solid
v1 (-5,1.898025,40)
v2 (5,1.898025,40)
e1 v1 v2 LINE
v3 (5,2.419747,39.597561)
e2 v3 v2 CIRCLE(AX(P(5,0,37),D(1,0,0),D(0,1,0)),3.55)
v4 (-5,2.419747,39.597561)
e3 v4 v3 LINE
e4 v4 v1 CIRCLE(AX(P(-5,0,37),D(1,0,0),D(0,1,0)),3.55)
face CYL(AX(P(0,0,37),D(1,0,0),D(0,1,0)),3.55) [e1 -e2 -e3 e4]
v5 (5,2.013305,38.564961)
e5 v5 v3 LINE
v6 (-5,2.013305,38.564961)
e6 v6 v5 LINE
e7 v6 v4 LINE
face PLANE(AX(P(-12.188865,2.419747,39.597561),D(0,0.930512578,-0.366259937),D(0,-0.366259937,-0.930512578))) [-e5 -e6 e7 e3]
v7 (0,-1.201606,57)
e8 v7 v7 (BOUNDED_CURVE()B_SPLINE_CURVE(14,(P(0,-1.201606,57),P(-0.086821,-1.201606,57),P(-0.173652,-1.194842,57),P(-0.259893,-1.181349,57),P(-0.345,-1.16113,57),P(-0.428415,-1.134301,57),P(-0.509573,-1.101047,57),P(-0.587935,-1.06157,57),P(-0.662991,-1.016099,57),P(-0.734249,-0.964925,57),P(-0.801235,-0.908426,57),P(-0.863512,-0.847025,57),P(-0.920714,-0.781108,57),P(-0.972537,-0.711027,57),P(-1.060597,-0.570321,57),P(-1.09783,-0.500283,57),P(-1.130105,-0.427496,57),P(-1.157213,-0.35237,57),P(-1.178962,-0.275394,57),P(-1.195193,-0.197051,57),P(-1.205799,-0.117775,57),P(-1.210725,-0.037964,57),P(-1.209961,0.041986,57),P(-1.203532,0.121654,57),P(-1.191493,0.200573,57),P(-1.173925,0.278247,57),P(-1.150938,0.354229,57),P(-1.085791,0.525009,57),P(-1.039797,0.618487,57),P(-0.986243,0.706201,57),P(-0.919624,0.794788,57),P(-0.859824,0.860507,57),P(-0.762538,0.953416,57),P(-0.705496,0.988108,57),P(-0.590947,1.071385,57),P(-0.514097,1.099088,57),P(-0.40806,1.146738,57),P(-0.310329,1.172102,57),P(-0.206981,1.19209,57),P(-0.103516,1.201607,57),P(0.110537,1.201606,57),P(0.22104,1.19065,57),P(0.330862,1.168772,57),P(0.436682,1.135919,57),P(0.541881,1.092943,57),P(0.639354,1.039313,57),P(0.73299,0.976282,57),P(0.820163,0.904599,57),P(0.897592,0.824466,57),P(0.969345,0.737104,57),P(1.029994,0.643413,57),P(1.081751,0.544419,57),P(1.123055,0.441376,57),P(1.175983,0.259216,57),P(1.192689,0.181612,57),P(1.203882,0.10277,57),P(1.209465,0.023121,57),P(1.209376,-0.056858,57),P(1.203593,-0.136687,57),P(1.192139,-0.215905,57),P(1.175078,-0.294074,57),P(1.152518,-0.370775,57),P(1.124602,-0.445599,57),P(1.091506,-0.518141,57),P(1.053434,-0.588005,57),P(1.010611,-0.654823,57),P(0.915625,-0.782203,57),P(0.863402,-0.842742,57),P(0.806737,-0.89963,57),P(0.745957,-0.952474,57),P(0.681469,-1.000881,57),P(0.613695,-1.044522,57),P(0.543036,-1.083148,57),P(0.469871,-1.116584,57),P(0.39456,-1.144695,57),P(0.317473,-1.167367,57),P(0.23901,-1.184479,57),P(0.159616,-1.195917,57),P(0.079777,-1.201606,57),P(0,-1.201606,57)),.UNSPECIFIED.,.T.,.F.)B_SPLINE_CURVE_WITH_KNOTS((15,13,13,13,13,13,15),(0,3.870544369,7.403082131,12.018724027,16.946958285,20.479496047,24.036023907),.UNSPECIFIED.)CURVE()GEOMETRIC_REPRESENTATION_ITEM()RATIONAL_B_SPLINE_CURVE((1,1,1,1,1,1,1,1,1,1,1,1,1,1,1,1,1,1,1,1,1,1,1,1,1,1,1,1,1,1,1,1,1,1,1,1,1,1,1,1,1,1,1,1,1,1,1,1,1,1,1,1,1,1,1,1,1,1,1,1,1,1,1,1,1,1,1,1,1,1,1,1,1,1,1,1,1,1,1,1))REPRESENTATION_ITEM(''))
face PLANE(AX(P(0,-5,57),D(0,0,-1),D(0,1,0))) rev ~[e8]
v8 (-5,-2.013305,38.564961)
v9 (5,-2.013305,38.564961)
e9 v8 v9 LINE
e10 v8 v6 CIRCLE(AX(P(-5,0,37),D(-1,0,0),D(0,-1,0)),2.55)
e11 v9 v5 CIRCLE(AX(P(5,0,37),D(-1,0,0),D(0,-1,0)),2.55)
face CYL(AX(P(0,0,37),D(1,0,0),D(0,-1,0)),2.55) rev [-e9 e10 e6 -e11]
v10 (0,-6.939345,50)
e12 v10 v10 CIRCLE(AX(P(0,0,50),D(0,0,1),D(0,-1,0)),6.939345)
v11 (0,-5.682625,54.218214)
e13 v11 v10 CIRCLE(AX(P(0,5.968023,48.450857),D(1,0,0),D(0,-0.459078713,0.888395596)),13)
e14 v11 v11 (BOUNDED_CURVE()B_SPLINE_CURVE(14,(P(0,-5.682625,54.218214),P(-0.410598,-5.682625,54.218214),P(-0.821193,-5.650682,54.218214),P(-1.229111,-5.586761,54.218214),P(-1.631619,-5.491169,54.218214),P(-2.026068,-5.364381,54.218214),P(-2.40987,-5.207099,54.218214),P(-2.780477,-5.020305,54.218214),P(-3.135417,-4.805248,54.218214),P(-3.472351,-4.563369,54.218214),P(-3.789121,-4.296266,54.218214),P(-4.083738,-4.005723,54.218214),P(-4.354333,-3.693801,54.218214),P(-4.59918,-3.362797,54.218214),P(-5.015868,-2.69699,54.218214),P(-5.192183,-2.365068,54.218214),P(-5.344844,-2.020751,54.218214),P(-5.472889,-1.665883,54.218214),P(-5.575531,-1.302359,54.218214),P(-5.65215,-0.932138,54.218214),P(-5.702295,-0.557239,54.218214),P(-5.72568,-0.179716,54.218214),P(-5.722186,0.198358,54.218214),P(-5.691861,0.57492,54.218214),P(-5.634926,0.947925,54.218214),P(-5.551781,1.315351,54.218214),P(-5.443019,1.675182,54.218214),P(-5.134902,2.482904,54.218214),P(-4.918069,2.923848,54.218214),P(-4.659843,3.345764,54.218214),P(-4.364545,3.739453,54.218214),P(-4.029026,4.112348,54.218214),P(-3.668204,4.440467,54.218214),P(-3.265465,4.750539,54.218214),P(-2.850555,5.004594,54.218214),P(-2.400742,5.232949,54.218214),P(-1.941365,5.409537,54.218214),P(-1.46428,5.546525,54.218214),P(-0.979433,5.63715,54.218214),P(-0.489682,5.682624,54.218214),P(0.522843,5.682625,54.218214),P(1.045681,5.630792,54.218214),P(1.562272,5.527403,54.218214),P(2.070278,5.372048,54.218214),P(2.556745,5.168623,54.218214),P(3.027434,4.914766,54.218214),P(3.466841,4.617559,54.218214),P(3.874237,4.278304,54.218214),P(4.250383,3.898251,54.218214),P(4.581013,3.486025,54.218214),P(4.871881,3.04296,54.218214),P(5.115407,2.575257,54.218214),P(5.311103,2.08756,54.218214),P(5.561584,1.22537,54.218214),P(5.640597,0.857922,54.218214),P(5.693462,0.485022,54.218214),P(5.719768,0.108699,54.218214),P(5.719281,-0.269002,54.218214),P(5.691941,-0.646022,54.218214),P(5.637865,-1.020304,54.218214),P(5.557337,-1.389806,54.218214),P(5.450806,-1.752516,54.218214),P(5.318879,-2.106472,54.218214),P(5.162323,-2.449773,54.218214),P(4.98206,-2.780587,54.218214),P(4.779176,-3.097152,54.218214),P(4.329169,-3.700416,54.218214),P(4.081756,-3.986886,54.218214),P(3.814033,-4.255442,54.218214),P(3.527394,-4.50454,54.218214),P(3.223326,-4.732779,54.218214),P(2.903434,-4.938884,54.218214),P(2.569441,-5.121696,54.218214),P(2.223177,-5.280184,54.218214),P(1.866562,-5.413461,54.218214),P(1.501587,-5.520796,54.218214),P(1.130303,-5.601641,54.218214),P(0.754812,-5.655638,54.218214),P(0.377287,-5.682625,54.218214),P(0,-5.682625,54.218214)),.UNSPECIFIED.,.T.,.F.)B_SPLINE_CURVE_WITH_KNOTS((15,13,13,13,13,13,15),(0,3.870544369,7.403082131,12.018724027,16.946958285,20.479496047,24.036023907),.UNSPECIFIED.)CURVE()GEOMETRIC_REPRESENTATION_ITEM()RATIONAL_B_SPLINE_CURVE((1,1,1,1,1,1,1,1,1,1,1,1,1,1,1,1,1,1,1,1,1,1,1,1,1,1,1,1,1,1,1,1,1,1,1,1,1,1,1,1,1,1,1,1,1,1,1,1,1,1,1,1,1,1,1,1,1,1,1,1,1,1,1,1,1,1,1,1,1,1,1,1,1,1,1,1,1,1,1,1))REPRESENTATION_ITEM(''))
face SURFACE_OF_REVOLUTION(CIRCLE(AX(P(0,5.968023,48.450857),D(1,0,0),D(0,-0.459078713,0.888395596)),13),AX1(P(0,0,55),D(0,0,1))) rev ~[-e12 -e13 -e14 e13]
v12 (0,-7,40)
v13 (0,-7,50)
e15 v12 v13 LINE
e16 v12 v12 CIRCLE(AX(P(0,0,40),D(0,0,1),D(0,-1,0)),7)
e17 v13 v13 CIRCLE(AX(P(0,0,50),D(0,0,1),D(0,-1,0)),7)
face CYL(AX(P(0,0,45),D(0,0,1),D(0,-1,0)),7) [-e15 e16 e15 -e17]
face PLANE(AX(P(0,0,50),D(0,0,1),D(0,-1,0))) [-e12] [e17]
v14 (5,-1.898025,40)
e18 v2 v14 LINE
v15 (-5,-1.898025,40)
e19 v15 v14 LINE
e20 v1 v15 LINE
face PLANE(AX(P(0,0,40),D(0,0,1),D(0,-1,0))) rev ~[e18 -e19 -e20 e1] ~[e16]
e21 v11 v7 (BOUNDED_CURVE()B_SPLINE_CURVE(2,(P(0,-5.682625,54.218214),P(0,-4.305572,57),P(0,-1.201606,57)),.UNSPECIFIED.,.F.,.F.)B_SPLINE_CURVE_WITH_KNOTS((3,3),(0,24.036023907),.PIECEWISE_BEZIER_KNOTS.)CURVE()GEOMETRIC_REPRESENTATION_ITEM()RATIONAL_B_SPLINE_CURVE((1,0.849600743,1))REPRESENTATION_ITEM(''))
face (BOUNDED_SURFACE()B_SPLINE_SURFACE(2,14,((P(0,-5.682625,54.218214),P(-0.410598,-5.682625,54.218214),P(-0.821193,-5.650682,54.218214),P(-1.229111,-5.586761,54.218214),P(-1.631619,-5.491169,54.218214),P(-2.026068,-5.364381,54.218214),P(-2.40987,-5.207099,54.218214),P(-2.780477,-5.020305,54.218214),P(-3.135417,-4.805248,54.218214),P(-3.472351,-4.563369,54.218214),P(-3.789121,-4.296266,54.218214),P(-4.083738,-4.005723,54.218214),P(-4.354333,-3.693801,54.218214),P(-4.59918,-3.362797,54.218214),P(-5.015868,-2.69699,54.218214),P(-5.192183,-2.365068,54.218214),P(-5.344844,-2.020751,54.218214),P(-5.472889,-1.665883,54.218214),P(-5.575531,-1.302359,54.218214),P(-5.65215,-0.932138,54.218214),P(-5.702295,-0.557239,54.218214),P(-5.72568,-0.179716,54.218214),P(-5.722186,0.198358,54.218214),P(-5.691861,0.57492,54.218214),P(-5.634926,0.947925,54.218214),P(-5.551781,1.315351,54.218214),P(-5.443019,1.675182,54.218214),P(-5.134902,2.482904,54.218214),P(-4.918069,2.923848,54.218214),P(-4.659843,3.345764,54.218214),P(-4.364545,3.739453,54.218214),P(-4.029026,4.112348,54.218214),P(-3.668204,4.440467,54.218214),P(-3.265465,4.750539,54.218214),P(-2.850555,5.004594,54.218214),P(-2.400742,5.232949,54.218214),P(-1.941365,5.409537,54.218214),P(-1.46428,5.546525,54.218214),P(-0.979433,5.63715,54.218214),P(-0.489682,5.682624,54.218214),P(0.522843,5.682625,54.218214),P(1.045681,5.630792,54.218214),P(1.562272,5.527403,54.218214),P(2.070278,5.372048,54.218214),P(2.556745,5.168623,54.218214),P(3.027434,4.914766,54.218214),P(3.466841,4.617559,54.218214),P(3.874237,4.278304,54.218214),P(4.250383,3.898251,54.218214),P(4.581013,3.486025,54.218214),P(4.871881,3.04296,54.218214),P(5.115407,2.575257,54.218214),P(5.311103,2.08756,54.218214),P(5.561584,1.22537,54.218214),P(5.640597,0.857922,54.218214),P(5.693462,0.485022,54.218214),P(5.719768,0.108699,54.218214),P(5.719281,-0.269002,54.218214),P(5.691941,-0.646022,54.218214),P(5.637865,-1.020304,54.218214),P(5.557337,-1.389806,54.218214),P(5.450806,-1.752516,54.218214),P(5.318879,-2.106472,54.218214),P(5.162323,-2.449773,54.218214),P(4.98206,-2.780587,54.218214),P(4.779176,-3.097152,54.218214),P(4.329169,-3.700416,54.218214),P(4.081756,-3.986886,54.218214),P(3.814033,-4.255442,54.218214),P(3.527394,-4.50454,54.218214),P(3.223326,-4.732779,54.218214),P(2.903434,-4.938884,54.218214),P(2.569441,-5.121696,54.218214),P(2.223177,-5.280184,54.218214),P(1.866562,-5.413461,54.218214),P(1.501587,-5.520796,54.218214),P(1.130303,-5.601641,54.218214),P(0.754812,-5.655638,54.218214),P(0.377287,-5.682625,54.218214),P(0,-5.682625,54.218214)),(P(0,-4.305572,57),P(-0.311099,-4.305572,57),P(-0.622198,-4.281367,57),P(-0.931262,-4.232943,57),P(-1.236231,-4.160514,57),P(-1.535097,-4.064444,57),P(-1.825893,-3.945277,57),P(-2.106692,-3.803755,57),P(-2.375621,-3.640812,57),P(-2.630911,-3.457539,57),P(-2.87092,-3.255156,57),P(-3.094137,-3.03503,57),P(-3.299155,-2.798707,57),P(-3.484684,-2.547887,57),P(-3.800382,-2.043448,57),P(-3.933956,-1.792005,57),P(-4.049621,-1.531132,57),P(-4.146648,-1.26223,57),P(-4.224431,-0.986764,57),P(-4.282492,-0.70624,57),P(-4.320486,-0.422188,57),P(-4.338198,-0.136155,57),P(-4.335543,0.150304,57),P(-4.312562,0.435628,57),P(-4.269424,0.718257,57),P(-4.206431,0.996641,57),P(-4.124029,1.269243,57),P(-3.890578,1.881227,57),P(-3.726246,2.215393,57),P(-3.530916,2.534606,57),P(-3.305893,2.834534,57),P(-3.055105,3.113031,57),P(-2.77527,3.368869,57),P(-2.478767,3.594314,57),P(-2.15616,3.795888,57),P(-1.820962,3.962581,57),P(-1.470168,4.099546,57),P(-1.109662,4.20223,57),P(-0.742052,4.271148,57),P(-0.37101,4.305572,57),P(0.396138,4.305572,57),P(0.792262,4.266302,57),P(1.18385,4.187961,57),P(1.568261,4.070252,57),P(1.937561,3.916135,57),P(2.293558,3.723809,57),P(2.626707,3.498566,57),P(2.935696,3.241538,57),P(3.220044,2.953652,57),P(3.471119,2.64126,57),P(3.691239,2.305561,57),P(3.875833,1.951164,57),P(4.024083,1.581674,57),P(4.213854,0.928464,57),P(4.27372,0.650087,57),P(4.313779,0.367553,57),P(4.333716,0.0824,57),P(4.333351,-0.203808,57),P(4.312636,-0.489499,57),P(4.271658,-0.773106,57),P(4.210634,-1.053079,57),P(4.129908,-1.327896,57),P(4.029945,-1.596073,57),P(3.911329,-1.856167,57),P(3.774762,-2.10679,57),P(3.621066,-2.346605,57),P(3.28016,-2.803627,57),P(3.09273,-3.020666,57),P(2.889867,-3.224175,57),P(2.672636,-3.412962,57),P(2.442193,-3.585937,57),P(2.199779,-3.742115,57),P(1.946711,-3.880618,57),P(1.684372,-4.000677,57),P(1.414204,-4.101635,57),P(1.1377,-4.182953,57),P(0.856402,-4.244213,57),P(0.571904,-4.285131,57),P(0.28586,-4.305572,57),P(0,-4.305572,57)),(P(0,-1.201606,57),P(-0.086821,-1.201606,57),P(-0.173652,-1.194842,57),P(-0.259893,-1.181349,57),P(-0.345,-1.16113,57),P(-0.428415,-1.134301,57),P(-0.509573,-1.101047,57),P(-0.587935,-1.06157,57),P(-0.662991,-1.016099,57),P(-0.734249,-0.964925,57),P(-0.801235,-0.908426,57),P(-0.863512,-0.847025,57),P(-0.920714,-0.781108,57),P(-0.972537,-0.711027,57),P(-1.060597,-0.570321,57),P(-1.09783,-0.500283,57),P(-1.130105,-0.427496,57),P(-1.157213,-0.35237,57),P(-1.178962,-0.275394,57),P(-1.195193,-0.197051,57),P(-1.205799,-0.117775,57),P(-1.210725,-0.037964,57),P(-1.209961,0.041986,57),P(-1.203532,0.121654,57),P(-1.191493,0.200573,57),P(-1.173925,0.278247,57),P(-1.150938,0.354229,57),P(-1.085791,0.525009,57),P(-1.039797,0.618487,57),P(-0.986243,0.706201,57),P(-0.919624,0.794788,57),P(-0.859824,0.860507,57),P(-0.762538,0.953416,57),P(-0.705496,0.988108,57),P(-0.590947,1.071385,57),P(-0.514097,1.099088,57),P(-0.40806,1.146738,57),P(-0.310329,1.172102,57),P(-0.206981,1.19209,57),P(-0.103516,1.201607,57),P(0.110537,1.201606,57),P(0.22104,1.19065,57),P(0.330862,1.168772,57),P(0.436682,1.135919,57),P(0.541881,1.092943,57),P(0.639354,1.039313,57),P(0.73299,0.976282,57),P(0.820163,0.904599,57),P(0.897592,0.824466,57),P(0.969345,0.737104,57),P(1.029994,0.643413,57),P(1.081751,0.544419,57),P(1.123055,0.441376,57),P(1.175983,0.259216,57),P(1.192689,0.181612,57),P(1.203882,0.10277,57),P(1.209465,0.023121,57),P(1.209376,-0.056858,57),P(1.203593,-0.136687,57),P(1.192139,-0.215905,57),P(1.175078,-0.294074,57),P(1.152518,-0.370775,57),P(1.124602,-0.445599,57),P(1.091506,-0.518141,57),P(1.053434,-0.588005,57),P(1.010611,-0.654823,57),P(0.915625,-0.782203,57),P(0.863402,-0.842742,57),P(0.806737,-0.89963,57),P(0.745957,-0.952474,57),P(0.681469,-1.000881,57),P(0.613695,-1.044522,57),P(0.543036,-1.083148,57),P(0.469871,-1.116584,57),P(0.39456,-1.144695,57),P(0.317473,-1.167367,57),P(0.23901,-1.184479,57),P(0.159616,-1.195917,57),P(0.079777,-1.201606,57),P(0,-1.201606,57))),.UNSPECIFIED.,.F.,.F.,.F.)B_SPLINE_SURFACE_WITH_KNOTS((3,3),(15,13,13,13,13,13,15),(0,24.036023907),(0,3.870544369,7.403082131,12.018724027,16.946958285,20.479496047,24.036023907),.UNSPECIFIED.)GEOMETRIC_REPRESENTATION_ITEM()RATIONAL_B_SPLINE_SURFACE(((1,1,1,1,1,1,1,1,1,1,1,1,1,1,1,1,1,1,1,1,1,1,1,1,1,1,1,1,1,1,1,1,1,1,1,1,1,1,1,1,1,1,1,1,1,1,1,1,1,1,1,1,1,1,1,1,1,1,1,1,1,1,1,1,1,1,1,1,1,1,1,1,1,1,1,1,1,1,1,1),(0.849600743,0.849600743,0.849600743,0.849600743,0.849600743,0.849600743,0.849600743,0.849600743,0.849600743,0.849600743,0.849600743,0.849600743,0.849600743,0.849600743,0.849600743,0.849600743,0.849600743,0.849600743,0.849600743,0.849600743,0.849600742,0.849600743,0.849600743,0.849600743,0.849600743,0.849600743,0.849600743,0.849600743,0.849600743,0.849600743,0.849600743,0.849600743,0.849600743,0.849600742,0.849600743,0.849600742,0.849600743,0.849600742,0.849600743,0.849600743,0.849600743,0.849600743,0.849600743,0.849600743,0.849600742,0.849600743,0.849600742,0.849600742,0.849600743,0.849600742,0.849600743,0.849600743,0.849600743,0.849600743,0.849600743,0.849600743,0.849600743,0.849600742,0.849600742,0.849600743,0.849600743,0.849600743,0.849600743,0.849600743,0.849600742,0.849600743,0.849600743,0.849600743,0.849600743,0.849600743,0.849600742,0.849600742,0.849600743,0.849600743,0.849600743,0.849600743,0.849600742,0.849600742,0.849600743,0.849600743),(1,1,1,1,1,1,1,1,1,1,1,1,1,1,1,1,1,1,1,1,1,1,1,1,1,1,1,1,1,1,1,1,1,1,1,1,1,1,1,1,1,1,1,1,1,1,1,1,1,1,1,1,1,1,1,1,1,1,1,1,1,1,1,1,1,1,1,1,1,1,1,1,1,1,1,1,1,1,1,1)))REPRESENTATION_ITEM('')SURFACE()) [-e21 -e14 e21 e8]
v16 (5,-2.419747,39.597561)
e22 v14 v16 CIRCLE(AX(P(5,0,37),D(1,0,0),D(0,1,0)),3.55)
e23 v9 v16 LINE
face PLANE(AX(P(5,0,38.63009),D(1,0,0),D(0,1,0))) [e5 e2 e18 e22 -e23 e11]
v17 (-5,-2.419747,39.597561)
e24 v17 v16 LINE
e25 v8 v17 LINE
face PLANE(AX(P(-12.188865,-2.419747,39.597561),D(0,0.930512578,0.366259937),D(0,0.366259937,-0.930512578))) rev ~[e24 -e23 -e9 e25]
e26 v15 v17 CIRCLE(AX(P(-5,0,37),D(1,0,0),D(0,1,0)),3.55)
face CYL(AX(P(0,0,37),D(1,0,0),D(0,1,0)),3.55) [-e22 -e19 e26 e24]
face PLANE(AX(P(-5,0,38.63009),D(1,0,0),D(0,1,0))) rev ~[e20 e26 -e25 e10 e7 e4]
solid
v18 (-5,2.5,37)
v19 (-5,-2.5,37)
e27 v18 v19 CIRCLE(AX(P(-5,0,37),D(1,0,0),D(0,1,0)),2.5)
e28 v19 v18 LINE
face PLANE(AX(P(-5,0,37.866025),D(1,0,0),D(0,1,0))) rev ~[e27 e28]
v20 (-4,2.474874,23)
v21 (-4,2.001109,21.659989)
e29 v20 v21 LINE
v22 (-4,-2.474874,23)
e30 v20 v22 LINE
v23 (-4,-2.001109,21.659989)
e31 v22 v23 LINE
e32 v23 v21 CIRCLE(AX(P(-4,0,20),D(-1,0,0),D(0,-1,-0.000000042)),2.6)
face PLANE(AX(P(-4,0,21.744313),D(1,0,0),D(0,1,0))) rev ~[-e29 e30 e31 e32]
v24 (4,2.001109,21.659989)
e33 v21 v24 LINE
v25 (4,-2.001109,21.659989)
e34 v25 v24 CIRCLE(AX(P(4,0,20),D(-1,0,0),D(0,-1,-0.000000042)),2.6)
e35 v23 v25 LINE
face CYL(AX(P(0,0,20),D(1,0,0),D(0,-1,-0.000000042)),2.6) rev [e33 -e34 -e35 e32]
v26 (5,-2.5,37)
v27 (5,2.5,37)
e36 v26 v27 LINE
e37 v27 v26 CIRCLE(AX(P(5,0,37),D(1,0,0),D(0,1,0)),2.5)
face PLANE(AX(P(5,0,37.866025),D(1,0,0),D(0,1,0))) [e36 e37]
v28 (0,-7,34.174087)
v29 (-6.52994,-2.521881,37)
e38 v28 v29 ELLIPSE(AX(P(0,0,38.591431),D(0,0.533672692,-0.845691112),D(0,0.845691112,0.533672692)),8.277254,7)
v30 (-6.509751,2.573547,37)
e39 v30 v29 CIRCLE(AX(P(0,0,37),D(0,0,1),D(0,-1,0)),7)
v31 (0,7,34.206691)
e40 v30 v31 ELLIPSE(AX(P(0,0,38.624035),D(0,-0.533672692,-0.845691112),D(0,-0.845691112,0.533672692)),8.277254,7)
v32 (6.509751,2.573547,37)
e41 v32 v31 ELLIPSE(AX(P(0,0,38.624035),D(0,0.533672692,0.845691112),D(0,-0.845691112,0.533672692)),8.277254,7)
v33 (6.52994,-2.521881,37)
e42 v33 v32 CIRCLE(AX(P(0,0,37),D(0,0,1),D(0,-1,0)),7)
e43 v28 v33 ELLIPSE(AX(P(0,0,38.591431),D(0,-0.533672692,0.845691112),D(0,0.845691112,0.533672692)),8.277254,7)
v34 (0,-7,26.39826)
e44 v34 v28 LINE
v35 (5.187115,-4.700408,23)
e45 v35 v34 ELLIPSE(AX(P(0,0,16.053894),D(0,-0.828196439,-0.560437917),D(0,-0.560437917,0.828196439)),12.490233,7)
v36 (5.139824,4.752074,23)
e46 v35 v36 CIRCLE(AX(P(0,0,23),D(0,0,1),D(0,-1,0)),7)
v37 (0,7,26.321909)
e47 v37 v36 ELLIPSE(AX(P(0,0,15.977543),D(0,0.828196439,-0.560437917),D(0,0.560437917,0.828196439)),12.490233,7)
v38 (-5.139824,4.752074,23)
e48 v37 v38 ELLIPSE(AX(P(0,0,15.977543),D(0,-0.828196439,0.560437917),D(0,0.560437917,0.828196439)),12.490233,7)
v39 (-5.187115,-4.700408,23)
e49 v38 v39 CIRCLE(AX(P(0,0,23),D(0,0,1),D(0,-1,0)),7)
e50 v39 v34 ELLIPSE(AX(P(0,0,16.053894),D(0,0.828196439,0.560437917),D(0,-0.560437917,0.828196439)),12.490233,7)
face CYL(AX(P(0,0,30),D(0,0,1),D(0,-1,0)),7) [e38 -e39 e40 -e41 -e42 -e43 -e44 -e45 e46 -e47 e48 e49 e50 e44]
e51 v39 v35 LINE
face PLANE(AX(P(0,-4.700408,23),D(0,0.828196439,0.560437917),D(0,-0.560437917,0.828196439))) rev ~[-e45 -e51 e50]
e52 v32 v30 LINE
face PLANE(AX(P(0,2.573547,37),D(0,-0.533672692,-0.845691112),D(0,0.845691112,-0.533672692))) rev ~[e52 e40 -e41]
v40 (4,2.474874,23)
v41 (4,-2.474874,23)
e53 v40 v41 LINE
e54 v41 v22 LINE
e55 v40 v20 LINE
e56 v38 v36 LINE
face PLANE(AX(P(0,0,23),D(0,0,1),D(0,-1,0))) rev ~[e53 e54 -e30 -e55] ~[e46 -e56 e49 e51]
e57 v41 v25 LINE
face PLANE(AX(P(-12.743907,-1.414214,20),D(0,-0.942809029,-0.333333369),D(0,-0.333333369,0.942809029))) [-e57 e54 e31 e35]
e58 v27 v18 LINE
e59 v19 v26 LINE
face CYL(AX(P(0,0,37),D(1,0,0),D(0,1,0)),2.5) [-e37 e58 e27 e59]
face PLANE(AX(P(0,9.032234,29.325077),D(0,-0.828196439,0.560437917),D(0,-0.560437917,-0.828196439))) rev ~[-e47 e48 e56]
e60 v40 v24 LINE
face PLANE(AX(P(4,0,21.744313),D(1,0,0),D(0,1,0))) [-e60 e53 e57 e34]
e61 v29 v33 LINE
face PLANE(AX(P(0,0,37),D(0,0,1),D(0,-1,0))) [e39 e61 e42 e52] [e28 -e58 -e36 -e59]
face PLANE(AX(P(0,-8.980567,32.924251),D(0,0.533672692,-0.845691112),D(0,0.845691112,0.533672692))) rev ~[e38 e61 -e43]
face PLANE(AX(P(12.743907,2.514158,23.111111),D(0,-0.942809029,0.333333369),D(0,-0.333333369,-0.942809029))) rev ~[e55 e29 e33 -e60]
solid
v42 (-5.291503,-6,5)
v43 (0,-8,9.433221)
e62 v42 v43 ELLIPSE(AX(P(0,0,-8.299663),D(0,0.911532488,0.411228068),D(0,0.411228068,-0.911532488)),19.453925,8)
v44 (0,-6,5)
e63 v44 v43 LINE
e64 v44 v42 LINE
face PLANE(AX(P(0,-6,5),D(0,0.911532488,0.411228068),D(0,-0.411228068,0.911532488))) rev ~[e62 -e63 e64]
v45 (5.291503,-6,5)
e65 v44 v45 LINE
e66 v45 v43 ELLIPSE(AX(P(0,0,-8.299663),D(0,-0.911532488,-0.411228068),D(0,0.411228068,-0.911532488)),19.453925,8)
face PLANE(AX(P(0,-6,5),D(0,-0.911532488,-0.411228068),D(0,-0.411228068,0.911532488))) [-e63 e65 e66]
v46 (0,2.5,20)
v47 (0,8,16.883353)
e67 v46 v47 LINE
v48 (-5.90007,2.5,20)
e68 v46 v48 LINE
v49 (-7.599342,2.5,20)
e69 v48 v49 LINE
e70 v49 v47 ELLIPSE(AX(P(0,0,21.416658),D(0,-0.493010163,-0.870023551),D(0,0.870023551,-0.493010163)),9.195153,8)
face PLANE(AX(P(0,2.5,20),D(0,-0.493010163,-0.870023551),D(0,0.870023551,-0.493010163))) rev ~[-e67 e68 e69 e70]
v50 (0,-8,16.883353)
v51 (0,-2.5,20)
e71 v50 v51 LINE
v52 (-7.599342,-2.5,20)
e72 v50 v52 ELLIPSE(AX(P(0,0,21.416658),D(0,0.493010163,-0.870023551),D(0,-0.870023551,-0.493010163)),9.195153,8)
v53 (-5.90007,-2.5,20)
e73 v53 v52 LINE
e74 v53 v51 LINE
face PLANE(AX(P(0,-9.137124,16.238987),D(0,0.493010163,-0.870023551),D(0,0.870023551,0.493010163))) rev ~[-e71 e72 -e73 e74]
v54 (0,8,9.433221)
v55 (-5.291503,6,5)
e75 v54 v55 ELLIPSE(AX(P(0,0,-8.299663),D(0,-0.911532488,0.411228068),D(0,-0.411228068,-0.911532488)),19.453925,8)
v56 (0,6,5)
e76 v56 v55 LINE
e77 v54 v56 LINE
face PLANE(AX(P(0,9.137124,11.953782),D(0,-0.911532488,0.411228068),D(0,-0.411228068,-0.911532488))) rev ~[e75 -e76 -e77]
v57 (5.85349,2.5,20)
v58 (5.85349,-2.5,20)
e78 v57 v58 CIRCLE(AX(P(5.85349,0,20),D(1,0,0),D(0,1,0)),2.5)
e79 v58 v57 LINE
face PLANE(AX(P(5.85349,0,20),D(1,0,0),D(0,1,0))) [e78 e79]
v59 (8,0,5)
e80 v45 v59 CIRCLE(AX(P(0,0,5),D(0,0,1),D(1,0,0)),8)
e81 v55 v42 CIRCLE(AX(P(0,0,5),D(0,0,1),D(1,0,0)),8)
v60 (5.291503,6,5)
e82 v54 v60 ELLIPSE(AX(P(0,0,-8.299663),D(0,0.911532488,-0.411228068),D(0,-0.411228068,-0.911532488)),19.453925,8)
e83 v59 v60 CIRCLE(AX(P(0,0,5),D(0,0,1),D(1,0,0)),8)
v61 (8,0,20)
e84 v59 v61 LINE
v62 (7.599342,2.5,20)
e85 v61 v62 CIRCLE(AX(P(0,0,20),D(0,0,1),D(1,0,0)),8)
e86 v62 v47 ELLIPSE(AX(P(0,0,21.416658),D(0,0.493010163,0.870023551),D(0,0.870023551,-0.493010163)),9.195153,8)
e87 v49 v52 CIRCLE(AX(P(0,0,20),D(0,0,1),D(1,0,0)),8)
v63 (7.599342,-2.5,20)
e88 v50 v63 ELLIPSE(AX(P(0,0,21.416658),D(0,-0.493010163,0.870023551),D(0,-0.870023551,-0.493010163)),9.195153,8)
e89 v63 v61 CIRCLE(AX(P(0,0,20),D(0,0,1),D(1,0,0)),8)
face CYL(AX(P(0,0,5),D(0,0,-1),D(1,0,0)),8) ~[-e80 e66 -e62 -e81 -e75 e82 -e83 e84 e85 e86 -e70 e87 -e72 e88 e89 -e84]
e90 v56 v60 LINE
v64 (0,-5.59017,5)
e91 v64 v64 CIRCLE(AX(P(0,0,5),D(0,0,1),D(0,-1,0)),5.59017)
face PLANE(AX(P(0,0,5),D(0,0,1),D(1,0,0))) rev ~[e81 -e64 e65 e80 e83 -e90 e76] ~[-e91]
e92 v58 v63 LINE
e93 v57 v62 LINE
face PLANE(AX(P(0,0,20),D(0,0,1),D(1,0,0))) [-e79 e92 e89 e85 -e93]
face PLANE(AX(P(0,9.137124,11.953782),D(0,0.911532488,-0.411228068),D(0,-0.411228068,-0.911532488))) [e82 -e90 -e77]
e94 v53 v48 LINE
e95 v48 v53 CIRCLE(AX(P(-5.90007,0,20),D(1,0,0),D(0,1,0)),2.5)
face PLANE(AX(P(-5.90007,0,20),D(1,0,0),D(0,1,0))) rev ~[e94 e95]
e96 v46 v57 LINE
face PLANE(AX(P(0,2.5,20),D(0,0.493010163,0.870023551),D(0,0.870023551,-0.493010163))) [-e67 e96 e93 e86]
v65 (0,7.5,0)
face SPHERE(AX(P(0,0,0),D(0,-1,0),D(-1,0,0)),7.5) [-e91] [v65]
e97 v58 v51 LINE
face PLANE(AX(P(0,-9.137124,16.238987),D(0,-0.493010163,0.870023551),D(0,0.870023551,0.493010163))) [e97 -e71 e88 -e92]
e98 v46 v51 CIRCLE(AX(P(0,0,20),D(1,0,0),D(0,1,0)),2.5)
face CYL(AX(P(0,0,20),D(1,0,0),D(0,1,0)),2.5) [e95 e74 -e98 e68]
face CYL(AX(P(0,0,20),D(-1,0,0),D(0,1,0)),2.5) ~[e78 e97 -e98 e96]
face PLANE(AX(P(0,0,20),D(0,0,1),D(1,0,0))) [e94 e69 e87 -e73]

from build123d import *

# Parameters (mm, degrees)
F3_R           = 8
F4_DEPTH       = 15
F5_R           = 2.5
F6_DEPTH       = 5.85349
F6_DEPTH_BACK  = 5.90007
F8_DEPTH       = 25
F8_DEPTH_BACK  = 25
F10_DEPTH      = 4
F10_DEPTH_BACK = 4
F11_W          = 7
F11_H          = 14
F13_T4_DEPTH   = 25.4878140401
F13_T9_DEPTH   = 25.4878140401
F15_DEPTH      = 5
F15_DEPTH_BACK = 5
F17_DEPTH      = 25
F17_DEPTH_BACK = 25
F19_DEPTH      = 5
F19_DEPTH_BACK = 5
F20_W          = 7
F20_H          = 10
F24_W          = 10
F24_H          = 3
F25_DEPTH      = 25
F25_DEPTH_BACK = 25
F26_R          = 5
F27_T1_DEPTH   = 24.3777308897


# Not quite as in the source:
# - a fillet or chamfer that OpenCascade refuses, or shapes differently, is made with other operations: its cross-section is extruded or revolved along the edge and cut away or added


with BuildPart() as f1:
    # F0 (on Top) → F1 (revolve)
    with BuildSketch(Plane.XY):
        with BuildLine():
            Line((0, -7.5), (0, 7.5))
            ThreePointArc((0, 7.5), (-7.5, 0), (0, -7.5))
        make_face()
    revolve(axis=Axis((0, 0, 0), (0, -1, 0)))

    # F3 (on offset) → F4 (join)
    with BuildSketch(Plane.XY.offset(5)):
        Circle(F3_R)
    extrude(amount=F4_DEPTH)

    # F5 (on Right) → F6 (join, two sides)
    with BuildSketch(Plane.YZ) as f6_sk:
        with Locations((0, 20)):
            Circle(F5_R)
    extrude(amount=F6_DEPTH)
    extrude(f6_sk.sketch, amount=-F6_DEPTH_BACK)

    # F7 (on Right) → F8 (cut, two sides)
    with BuildSketch(Plane.YZ) as f8_sk:
        Polygon((9.1371238232, 20), (2.5, 20), (9.1371238232, 16.2389874458), align=None)
        Polygon((-9.1371238232, 16.2389874458), (-2.5, 20), (-9.1371238232, 20), align=None)
        Polygon((-9.1371238232, 11.9537818628), (-9.1371238232, 5), (-6, 5), align=None)
        Polygon((9.1371238232, 11.9537818628), (6, 5), (9.1371238232, 5), align=None)
    extrude(amount=-F8_DEPTH, mode=Mode.SUBTRACT)
    extrude(f8_sk.sketch, amount=F8_DEPTH_BACK, mode=Mode.SUBTRACT)


with BuildPart() as f10:
    # F9 (on Right) → F10 (new body, two sides)
    with BuildSketch(Plane.YZ) as f10_sk:
        with BuildLine():
            ThreePointArc((-2.6, 20), (0, 22.6000001084), (2.6, 20))
            Line((2.6, 20), (4, 20))
            ThreePointArc((4, 20), (0, 24.0000001084), (-4, 20))
            Line((-4, 20), (-2.6, 20))
        make_face()
    extrude(amount=F10_DEPTH)
    extrude(f10_sk.sketch, amount=-F10_DEPTH_BACK)

    # F11 (on Right) → F12 (revolve)
    with BuildSketch(Plane.YZ):
        with Locations((-3.5, 30)):
            Rectangle(F11_W, F11_H)
    revolve(axis=Axis((0, 0, 30), (0, 0, 1)))

    # F13: chamfer of 1.75 on 2 edges, made by hand


with BuildPart() as f13_tool2:
    # F13_s3 → F13_t4 (new body)
    with BuildSketch(Plane.YZ.offset(-12.74390702)):
        with BuildLine():
            Line((-1.4142136966, 20), (-2.5141576828, 23.1111110268))
            ThreePointArc((-2.5141576828, 23.1111110268), (-3.5976530662, 21.7483972072), (-4, 20))
            Line((-4, 20), (-1.4142136966, 20))
        make_face()
    extrude(amount=F13_T4_DEPTH)

    split(bisect_by=Plane.XY.offset(23), keep=Keep.BOTTOM)


with BuildPart() as f10_1:
    add(f10.part)

    # F13_t1: cut F13_tool2
    add(f13_tool2.part, mode=Mode.SUBTRACT)


with BuildPart() as f13_tool7:
    # F13_s8 → F13_t9 (new body)
    with BuildSketch(Plane.YZ.offset(12.74390702)):
        with BuildLine():
            Line((2.5141576828, 23.1111110268), (1.4142136966, 20))
            Line((1.4142136966, 20), (4, 20))
            ThreePointArc((4, 20), (3.5976530662, 21.7483972072), (2.5141576828, 23.1111110268))
        make_face()
    extrude(amount=-F13_T9_DEPTH)

    split(bisect_by=Plane.XY.offset(23), keep=Keep.BOTTOM)


with BuildPart() as f10_2:
    add(f10_1.part)

    # F13_t6: cut F13_tool7
    add(f13_tool7.part, mode=Mode.SUBTRACT)

    # F14 (on Right) → F15 (join, two sides)
    with BuildSketch(Plane.YZ) as f15_sk:
        with BuildLine():
            Line((-2.5, 37), (2.5, 37))
            ThreePointArc((2.5, 37), (0, 39.5), (-2.5, 37))
        make_face()
    extrude(amount=F15_DEPTH)
    extrude(f15_sk.sketch, amount=-F15_DEPTH_BACK)

    # F16 (on Right) → F17 (cut, two sides)
    with BuildSketch(Plane.YZ) as f17_sk:
        Polygon((-8.9805674515, 23), (-4.7004079688, 23), (-8.9805674515, 29.3250767589), align=None)
        Polygon((9.0322339683, 29.3250767589), (4.7520744856, 23), (9.0322339683, 23), align=None)
        Polygon((-8.9805674515, 32.9242510796), (-2.5218809023, 37), (-8.9805674515, 37), align=None)
        Polygon((9.0322339683, 37), (2.5735474192, 37), (9.0322339683, 32.9242510796), align=None)
    extrude(amount=-F17_DEPTH, mode=Mode.SUBTRACT)
    extrude(f17_sk.sketch, amount=F17_DEPTH_BACK, mode=Mode.SUBTRACT)


with BuildPart() as f19:
    # F18 (on Right) → F19 (new body, two sides)
    with BuildSketch(Plane.YZ) as f19_sk:
        with BuildLine():
            ThreePointArc((-2.55, 37), (0, 39.55), (2.55, 37))
            Line((2.55, 37), (3.55, 37))
            ThreePointArc((3.55, 37), (0, 40.55), (-3.55, 37))
            Line((-3.55, 37), (-2.55, 37))
        make_face()
    extrude(amount=F19_DEPTH)
    extrude(f19_sk.sketch, amount=-F19_DEPTH_BACK)

    # F20 (on Right) → F21 (revolve)
    with BuildSketch(Plane.YZ):
        with Locations((-3.5, 45)):
            Rectangle(F20_W, F20_H)
    revolve(axis=Axis((0, 0, 45), (0, 0, 1)))

    # F22 (on Right) → F23 (revolve)
    with BuildSketch(Plane.YZ):
        with BuildLine():
            Line((-6.9393450394, 50), (0, 50))
            Line((0, 50), (0, 60))
            ThreePointArc((0, 60), (-4.7123372957, 55.8623279649), (-6.9393450394, 50))
        make_face()
    revolve(axis=Axis((0, 0, 55), (0, 0, 1)))

    # F24 (on Right) → F25 (cut, two sides)
    with BuildSketch(Plane.YZ) as f25_sk:
        with Locations((0, 58.5)):
            Rectangle(F24_W, F24_H)
    extrude(amount=-F25_DEPTH, mode=Mode.SUBTRACT)
    extrude(f25_sk.sketch, amount=F25_DEPTH_BACK, mode=Mode.SUBTRACT)

    # F26
    f26_edges = [f19.edges().sort_by_distance(p)[0] for p in [
        (0, 3.825452, 57),
    ]]
    fillet(f26_edges, radius=F26_R)

    # F27: chamfer of 1.5 on 2 edges, made by hand

    # F27_s2 → F27_t1 (cut)
    with BuildSketch(Plane.YZ.offset(-12.1888654448)):
        with BuildLine():
            Line((-2.4197472963, 39.5975609756), (-1.3973188612, 37))
            Line((-1.3973188612, 37), (-3.55, 37))
            ThreePointArc((-3.55, 37), (-3.2459574924, 38.4374491147), (-2.4197472963, 39.5975609756))
        make_face()
        with BuildLine():
            Line((2.4197472963, 39.5975609756), (1.3973188612, 37))
            Line((1.3973188612, 37), (3.55, 37))
            ThreePointArc((3.55, 37), (3.2459574924, 38.4374491147), (2.4197472963, 39.5975609756))
        make_face()
    extrude(amount=F27_T1_DEPTH, mode=Mode.SUBTRACT)


solid = Compound([f1.part, f10_2.part, f19.part])
